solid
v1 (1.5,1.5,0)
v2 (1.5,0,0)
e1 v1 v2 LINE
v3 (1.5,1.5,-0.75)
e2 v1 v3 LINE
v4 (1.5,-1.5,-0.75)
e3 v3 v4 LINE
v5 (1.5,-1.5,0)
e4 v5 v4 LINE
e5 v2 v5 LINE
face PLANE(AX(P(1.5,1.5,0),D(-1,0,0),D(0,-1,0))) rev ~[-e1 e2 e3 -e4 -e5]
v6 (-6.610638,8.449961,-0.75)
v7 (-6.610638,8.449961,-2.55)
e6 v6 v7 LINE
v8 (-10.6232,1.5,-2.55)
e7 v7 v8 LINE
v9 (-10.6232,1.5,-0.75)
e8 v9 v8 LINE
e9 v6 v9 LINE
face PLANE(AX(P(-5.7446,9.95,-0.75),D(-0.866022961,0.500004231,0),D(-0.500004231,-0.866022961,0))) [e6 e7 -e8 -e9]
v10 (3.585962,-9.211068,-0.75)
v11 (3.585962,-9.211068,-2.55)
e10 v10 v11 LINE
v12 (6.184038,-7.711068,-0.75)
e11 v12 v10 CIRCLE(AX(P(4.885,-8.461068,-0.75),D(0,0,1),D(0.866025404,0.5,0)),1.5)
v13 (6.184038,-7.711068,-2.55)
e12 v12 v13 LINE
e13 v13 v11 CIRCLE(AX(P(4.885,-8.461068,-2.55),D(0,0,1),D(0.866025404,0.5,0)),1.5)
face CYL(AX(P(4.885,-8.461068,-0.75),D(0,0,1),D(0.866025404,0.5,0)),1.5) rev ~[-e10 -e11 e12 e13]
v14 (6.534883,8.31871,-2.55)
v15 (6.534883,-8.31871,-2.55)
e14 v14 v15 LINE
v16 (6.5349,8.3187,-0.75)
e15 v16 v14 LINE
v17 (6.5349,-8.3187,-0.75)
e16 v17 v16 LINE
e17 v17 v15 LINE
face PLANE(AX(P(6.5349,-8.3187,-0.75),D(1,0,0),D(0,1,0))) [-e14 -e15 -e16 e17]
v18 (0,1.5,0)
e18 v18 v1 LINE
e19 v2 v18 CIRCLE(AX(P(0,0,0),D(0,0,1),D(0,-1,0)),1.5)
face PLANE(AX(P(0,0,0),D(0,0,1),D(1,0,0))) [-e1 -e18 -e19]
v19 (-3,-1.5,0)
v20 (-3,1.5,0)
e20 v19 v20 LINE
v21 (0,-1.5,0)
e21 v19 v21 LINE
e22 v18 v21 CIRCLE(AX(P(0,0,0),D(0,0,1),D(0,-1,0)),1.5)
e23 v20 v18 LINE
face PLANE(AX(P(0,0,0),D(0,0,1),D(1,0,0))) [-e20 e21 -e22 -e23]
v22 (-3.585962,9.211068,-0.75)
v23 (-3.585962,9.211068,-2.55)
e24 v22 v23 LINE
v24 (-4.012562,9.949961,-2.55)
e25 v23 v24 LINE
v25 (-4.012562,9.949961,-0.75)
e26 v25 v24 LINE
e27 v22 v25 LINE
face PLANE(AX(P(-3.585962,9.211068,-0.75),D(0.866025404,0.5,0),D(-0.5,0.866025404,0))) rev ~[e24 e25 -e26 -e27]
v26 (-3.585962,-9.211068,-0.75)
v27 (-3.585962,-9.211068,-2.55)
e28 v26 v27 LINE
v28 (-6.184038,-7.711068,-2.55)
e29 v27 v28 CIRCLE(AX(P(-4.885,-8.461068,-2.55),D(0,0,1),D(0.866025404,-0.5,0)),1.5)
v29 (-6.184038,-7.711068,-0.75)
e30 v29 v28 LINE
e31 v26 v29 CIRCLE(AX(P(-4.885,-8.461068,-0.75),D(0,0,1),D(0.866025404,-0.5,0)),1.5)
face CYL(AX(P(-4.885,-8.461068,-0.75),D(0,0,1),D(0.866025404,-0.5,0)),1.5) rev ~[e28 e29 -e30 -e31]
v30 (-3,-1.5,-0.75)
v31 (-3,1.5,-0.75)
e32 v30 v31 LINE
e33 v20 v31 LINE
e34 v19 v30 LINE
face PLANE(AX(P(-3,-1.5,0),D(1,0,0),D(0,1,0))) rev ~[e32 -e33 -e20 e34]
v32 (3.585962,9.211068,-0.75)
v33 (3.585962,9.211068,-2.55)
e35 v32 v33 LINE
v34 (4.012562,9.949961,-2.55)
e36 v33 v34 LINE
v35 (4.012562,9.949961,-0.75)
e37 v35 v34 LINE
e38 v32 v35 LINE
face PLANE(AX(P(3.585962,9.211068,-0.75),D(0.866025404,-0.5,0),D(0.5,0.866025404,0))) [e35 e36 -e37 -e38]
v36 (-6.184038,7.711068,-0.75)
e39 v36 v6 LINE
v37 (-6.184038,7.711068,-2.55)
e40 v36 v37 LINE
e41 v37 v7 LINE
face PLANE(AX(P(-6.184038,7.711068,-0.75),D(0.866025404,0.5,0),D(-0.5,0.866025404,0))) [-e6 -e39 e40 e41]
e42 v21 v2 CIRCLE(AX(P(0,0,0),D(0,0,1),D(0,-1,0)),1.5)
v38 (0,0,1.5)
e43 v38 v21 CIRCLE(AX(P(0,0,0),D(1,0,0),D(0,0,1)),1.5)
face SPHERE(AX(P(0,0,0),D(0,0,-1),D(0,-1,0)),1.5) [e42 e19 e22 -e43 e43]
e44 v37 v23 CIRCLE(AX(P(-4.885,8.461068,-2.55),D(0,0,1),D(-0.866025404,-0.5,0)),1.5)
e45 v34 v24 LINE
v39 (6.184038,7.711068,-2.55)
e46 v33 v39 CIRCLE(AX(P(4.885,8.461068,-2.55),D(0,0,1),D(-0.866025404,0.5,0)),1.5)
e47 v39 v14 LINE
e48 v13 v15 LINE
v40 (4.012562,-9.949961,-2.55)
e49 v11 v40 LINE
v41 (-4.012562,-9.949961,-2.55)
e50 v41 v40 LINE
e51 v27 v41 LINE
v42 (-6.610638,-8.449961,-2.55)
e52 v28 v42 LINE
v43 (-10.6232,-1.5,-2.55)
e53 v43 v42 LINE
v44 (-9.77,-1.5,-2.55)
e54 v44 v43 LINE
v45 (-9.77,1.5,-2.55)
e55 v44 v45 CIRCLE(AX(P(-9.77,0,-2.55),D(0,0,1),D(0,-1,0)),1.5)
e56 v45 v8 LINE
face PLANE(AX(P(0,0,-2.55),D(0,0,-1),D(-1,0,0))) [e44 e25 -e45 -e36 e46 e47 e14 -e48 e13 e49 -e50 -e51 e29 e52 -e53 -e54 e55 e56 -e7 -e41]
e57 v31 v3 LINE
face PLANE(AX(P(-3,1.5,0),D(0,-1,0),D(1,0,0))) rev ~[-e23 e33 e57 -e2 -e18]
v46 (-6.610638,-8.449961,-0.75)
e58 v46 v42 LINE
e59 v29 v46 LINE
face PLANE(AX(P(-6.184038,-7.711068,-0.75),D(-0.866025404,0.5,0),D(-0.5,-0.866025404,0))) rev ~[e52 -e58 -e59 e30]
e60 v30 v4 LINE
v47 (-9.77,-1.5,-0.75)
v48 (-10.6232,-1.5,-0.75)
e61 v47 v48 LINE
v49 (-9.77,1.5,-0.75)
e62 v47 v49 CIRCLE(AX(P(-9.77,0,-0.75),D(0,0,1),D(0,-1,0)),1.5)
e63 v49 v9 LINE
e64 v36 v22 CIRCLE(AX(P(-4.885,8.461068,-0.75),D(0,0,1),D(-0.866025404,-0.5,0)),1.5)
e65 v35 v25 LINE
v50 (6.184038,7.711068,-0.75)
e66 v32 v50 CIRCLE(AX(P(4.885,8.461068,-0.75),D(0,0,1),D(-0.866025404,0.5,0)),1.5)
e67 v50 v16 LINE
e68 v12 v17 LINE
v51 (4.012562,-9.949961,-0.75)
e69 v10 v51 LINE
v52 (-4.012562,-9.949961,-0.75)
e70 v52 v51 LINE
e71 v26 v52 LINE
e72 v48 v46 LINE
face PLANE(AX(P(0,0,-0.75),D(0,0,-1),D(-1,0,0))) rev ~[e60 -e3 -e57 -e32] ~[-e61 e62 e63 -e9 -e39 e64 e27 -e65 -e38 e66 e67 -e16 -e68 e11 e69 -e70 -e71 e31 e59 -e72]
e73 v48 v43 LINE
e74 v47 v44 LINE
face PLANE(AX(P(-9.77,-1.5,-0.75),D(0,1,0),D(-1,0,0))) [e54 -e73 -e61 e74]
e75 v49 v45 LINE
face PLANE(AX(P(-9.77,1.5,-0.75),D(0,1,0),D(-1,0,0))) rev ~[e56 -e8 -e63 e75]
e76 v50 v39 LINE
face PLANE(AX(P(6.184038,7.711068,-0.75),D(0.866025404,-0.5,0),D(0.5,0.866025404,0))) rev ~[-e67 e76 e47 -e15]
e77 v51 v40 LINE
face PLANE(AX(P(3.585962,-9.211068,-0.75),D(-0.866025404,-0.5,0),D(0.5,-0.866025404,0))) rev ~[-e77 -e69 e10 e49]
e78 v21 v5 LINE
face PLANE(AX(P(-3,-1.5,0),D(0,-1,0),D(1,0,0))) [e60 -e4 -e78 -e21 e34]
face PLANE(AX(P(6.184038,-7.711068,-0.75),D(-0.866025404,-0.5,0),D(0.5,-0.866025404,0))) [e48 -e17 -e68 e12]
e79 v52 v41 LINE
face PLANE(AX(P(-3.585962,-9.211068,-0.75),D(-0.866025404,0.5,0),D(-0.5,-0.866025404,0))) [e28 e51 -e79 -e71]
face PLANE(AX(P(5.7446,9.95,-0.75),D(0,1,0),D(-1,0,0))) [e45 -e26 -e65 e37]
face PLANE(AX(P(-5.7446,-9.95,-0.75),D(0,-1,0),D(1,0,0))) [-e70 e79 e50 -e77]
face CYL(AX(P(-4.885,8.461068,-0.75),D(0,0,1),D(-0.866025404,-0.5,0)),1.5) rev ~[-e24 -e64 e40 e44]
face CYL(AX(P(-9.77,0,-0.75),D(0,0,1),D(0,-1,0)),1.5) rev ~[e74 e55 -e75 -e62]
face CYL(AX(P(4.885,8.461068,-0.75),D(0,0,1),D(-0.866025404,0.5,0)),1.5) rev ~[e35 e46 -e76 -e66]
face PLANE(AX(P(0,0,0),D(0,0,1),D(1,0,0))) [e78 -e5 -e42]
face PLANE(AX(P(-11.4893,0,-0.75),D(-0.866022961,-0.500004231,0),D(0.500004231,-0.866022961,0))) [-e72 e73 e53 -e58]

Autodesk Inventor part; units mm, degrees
ref_plane "YZ Plane" through (0, 0, 0) normal (1, 0, 0) x (0, 1, 0)
ref_plane "XZ Plane" through (0, 0, 0) normal (0, 1, 0) x (-1, 0, 0)
ref_plane "XY Plane" through (0, 0, 0) normal (0, 0, 1) x (1, 0, 0)
sketch "Skizze1" plane through (0, 0, 0) normal (0, 0, 1) x (1, 0, 0)
  line L0 (-3, 1.5) -> (1.5, 1.5)
  line L1 (1.5, 1.5) -> (1.5, -1.5)
  line L2 (-3, -1.5) -> (-3, 1.5)
  line L3 (1.5, 1.5) -> (-1.5, -1.5) construction
  line L4 (-1.5, -1.5) -> (1.5, -1.5) construction
  line L5 (0, 0) -> (0.1963, -0.4081) construction
  line L6 (-3, -1.5) -> (1.5, -1.5)
  dimension "d0" = 3
  dimension "d1" = 4.5
extrude "Extrusion1" add sketch "Skizze1" against normal blind 0.75
sketch "Skizze2" plane through (0, 0, 0) normal (1, 0, 0) x (0, 1, 0)
  line L0 (-1.5, 0) -> (1.5, 0) projected
  arc A0 (0, 1.5) -> (-1.5, 0) centre (0, 0) ccw
  line L1 (0, 0) -> (0, 1.5)
  line L2 (0, 0) -> (-1.5, 0)
  dimension "d4" = 1.5
revolve "Umdrehung1" add sketch "Skizze2" angle 360 about axis through (0, 0, 0) along (0, 0, 1)
sketch "Skizze3" plane through (0, 0, -0.75) normal (0, 0, -1) x (-1, 0, 0)
  line L0 (11.4893, 0) -> (5.7446, -9.95)
  line L1 (5.7446, -9.95) -> (-5.7446, -9.95)
  line L2 (-5.7446, -9.95) -> (-11.4893, 0)
  line L3 (-11.4893, 0) -> (-5.7446, 9.95)
  line L4 (-5.7446, 9.95) -> (5.7446, 9.95)
  line L5 (5.7446, 9.95) -> (11.4893, 0)
  point P0 (0, 0)
  point P1 (0, 0)
  dimension "d7" = 19.9
extrude "Extrusion2" add sketch "Skizze3" along normal blind 1.8
sketch "Skizze4" plane through (0, 0, -0.75) normal (0, 0, 1) x (1, 0, 0)
  line L0 (-11.4893, 0) -> (-5.7446, -9.95) projected
  line L1 (-5.7446, 9.95) -> (-11.4893, 0) projected
  line L2 (1.5, -1.5) -> (-3, -1.5) projected
  line L3 (0, 0) -> (-9.77, 0) construction
  arc A0 (-9.77, -1.5) -> (-9.77, 1.5) centre (-9.77, 0) ccw
  line L4 (-9.77, -1.5) -> (-10.6232, -1.5)
  line L5 (-9.77, 1.5) -> (-10.6232, 1.5)
  dimension "d10" = 9.77
  dimension "d11" = 3
extrude "Extrusion3" cut sketch "Skizze4" against normal blind 1.8
pattern_circular "Runde Anordnung1" count 6 over 360 about axis through (0, 0, -10) along (0, 0, 1) of "Extrusion3"
ref_plane "Arbeitsebene1" through (13.7343, 6, -7.9495) normal (0.7071068, 0, 0.7071068) x (0, 1, 0)
sketch "Skizze6" plane through (0, 0, -0.75) normal (0, 0, 1) x (1, 0, 0)
  line L0 (-6.184, 7.7111) -> (-6.6107, 8.45) construction
  line L1 (-6.6107, 8.45) -> (-10.6232, 1.5) construction
  line L2 (-10.6232, 1.5) -> (-9.77, 1.5) construction
  arc A0 (-9.77, -1.5) -> (-9.77, 1.5) centre (-9.77, 0) ccw construction
  line L3 (-9.77, -1.5) -> (-10.6232, -1.5) construction
  line L4 (-10.6232, -1.5) -> (-6.6107, -8.45) construction
  line L5 (-6.6107, -8.45) -> (-6.184, -7.7111) construction
  arc A1 (-3.586, -9.2111) -> (-6.184, -7.7111) centre (-4.885, -8.4611) ccw construction
  line L6 (-3.586, -9.2111) -> (-4.0126, -9.95) construction
  line L7 (-4.0126, -9.95) -> (4.0126, -9.95) construction
  line L8 (4.0126, -9.95) -> (3.586, -9.2111) construction
  arc A2 (6.184, -7.7111) -> (3.586, -9.2111) centre (4.885, -8.4611) ccw construction
  line L9 (6.184, -7.7111) -> (6.6107, -8.45) construction
  line L10 (6.6107, -8.45) -> (10.6232, -1.5) projected
  line L11 (10.6232, -1.5) -> (9.77, -1.5) projected
  arc A3 (9.77, 1.5) -> (9.77, -1.5) centre (9.77, 0) ccw projected
  line L12 (9.77, 1.5) -> (10.6232, 1.5) projected
  line L13 (10.6232, 1.5) -> (6.6107, 8.45) projected
  line L14 (6.6107, 8.45) -> (6.184, 7.7111) construction
  arc A4 (3.586, 9.2111) -> (6.184, 7.7111) centre (4.885, 8.4611) ccw construction
  line L15 (3.586, 9.2111) -> (4.0126, 9.95) construction
  line L16 (4.0126, 9.95) -> (-4.0126, 9.95) construction
  line L17 (-4.0126, 9.95) -> (-3.586, 9.2111) construction
  arc A5 (-6.184, 7.7111) -> (-3.586, 9.2111) centre (-4.885, 8.4611) ccw construction
  line L18 (-3, -1.5) -> (-3, 1.5) construction
  line L19 (-3, 1.5) -> (1.5, 1.5) construction
  line L20 (1.5, 1.5) -> (1.5, -1.5) construction
  line L21 (1.5, -1.5) -> (-3, -1.5) construction
  line L22 (-4.0126, -9.95) -> (-3.586, -9.2111) construction
  arc A6 (-3.586, -9.2111) -> (-6.184, -7.7111) centre (-4.885, -8.4611) ccw construction
  line L23 (-6.184, -7.7111) -> (-6.6107, -8.45) construction
  line L24 (-6.6107, -8.45) -> (-10.6232, -1.5) construction
  line L25 (-10.6232, -1.5) -> (-9.77, -1.5) construction
  arc A7 (-9.77, -1.5) -> (-9.77, 1.5) centre (-9.77, 0) ccw construction
  line L26 (-9.77, 1.5) -> (-10.6232, 1.5) construction
  line L27 (-10.6232, 1.5) -> (-6.6107, 8.45) construction
  line L28 (-6.6107, 8.45) -> (-6.184, 7.7111) construction
  arc A8 (-6.184, 7.7111) -> (-3.586, 9.2111) centre (-4.885, 8.4611) ccw construction
  line L29 (-3.586, 9.2111) -> (-4.0126, 9.95) construction
  line L30 (-4.0126, 9.95) -> (4.0126, 9.95) construction
  line L31 (4.0126, 9.95) -> (3.586, 9.2111) construction
  arc A9 (3.586, 9.2111) -> (6.184, 7.7111) centre (4.885, 8.4611) ccw construction
  line L32 (6.184, 7.7111) -> (6.6107, 8.45) construction
  line L33 (6.6107, 8.45) -> (10.6232, 1.5) construction
  line L34 (10.6232, 1.5) -> (9.77, 1.5) projected
  arc A10 (9.77, 1.5) -> (9.77, -1.5) centre (9.77, 0) ccw projected
  line L35 (9.77, -1.5) -> (10.6232, -1.5) projected
  line L36 (10.6232, -1.5) -> (6.6107, -8.45) construction
  line L37 (6.6107, -8.45) -> (6.184, -7.7111) construction
  arc A11 (6.184, -7.7111) -> (3.586, -9.2111) centre (4.885, -8.4611) ccw construction
  line L38 (3.586, -9.2111) -> (4.0126, -9.95) construction
  line L39 (4.0126, -9.95) -> (-4.0126, -9.95) construction
  line L40 (-3, -1.5) -> (-3, 1.5) construction
  line L41 (-3, 1.5) -> (1.5, 1.5) construction
  line L42 (1.5, 1.5) -> (1.5, -1.5) construction
  line L43 (1.5, -1.5) -> (-3, -1.5) construction
  line L44 (-4.0126, -9.95) -> (-3.586, -9.2111) construction
  arc A12 (-3.586, -9.2111) -> (-6.184, -7.7111) centre (-4.885, -8.4611) ccw construction
  line L45 (-6.184, -7.7111) -> (-6.6107, -8.45) construction
  line L46 (-6.6107, -8.45) -> (-10.6232, -1.5) construction
  line L47 (-10.6232, -1.5) -> (-9.77, -1.5) construction
  arc A13 (-9.77, -1.5) -> (-9.77, 1.5) centre (-9.77, 0) ccw construction
  line L48 (-9.77, 1.5) -> (-10.6232, 1.5) construction
  line L49 (-10.6232, 1.5) -> (-6.6107, 8.45) construction
  line L50 (-6.6107, 8.45) -> (-6.184, 7.7111) construction
  arc A14 (-6.184, 7.7111) -> (-3.586, 9.2111) centre (-4.885, 8.4611) ccw construction
  line L51 (-3.586, 9.2111) -> (-4.0126, 9.95) construction
  line L52 (-4.0126, 9.95) -> (4.0126, 9.95) construction
  line L53 (4.0126, 9.95) -> (3.586, 9.2111) construction
  arc A15 (3.586, 9.2111) -> (6.184, 7.7111) centre (4.885, 8.4611) ccw construction
  line L54 (6.184, 7.7111) -> (6.6107, 8.45) construction
  line L55 (6.6107, 8.45) -> (10.6232, 1.5) construction
  line L56 (10.6232, 1.5) -> (9.77, 1.5) projected
  arc A16 (9.77, 1.5) -> (9.77, -1.5) centre (9.77, 0) ccw projected
  line L57 (9.77, -1.5) -> (10.6232, -1.5) projected
  line L58 (10.6232, -1.5) -> (6.6107, -8.45) construction
  line L59 (6.6107, -8.45) -> (6.184, -7.7111) construction
  arc A17 (6.184, -7.7111) -> (3.586, -9.2111) centre (4.885, -8.4611) ccw construction
  line L60 (3.586, -9.2111) -> (4.0126, -9.95) construction
  line L61 (4.0126, -9.95) -> (-4.0126, -9.95) construction
  line L62 (-3, -1.5) -> (-3, 1.5) construction
  line L63 (-3, 1.5) -> (1.5, 1.5) construction
  line L64 (1.5, 1.5) -> (1.5, -1.5) construction
  line L65 (1.5, -1.5) -> (-3, -1.5) construction
  line L66 (6.5349, 13.93) -> (6.5349, -13.93) construction
  line L67 (6.6107, -8.45) -> (10.6232, -1.5) projected
  line L68 (6.6107, -8.45) -> (6.5349, -8.3187)
  line L69 (6.184, -7.7111) -> (6.6107, -8.45) projected
  line L70 (6.5349, -8.3187) -> (6.5349, 8.3187)
  line L71 (6.6107, 8.45) -> (6.184, 7.7111) projected
  line L72 (6.5349, 8.3187) -> (6.6107, 8.45)
  point P0 (0, 0)
extrude "Extrusion4" cut sketch "Skizze6" against normal through all
properties part number "Luxeon Rebel Star"
